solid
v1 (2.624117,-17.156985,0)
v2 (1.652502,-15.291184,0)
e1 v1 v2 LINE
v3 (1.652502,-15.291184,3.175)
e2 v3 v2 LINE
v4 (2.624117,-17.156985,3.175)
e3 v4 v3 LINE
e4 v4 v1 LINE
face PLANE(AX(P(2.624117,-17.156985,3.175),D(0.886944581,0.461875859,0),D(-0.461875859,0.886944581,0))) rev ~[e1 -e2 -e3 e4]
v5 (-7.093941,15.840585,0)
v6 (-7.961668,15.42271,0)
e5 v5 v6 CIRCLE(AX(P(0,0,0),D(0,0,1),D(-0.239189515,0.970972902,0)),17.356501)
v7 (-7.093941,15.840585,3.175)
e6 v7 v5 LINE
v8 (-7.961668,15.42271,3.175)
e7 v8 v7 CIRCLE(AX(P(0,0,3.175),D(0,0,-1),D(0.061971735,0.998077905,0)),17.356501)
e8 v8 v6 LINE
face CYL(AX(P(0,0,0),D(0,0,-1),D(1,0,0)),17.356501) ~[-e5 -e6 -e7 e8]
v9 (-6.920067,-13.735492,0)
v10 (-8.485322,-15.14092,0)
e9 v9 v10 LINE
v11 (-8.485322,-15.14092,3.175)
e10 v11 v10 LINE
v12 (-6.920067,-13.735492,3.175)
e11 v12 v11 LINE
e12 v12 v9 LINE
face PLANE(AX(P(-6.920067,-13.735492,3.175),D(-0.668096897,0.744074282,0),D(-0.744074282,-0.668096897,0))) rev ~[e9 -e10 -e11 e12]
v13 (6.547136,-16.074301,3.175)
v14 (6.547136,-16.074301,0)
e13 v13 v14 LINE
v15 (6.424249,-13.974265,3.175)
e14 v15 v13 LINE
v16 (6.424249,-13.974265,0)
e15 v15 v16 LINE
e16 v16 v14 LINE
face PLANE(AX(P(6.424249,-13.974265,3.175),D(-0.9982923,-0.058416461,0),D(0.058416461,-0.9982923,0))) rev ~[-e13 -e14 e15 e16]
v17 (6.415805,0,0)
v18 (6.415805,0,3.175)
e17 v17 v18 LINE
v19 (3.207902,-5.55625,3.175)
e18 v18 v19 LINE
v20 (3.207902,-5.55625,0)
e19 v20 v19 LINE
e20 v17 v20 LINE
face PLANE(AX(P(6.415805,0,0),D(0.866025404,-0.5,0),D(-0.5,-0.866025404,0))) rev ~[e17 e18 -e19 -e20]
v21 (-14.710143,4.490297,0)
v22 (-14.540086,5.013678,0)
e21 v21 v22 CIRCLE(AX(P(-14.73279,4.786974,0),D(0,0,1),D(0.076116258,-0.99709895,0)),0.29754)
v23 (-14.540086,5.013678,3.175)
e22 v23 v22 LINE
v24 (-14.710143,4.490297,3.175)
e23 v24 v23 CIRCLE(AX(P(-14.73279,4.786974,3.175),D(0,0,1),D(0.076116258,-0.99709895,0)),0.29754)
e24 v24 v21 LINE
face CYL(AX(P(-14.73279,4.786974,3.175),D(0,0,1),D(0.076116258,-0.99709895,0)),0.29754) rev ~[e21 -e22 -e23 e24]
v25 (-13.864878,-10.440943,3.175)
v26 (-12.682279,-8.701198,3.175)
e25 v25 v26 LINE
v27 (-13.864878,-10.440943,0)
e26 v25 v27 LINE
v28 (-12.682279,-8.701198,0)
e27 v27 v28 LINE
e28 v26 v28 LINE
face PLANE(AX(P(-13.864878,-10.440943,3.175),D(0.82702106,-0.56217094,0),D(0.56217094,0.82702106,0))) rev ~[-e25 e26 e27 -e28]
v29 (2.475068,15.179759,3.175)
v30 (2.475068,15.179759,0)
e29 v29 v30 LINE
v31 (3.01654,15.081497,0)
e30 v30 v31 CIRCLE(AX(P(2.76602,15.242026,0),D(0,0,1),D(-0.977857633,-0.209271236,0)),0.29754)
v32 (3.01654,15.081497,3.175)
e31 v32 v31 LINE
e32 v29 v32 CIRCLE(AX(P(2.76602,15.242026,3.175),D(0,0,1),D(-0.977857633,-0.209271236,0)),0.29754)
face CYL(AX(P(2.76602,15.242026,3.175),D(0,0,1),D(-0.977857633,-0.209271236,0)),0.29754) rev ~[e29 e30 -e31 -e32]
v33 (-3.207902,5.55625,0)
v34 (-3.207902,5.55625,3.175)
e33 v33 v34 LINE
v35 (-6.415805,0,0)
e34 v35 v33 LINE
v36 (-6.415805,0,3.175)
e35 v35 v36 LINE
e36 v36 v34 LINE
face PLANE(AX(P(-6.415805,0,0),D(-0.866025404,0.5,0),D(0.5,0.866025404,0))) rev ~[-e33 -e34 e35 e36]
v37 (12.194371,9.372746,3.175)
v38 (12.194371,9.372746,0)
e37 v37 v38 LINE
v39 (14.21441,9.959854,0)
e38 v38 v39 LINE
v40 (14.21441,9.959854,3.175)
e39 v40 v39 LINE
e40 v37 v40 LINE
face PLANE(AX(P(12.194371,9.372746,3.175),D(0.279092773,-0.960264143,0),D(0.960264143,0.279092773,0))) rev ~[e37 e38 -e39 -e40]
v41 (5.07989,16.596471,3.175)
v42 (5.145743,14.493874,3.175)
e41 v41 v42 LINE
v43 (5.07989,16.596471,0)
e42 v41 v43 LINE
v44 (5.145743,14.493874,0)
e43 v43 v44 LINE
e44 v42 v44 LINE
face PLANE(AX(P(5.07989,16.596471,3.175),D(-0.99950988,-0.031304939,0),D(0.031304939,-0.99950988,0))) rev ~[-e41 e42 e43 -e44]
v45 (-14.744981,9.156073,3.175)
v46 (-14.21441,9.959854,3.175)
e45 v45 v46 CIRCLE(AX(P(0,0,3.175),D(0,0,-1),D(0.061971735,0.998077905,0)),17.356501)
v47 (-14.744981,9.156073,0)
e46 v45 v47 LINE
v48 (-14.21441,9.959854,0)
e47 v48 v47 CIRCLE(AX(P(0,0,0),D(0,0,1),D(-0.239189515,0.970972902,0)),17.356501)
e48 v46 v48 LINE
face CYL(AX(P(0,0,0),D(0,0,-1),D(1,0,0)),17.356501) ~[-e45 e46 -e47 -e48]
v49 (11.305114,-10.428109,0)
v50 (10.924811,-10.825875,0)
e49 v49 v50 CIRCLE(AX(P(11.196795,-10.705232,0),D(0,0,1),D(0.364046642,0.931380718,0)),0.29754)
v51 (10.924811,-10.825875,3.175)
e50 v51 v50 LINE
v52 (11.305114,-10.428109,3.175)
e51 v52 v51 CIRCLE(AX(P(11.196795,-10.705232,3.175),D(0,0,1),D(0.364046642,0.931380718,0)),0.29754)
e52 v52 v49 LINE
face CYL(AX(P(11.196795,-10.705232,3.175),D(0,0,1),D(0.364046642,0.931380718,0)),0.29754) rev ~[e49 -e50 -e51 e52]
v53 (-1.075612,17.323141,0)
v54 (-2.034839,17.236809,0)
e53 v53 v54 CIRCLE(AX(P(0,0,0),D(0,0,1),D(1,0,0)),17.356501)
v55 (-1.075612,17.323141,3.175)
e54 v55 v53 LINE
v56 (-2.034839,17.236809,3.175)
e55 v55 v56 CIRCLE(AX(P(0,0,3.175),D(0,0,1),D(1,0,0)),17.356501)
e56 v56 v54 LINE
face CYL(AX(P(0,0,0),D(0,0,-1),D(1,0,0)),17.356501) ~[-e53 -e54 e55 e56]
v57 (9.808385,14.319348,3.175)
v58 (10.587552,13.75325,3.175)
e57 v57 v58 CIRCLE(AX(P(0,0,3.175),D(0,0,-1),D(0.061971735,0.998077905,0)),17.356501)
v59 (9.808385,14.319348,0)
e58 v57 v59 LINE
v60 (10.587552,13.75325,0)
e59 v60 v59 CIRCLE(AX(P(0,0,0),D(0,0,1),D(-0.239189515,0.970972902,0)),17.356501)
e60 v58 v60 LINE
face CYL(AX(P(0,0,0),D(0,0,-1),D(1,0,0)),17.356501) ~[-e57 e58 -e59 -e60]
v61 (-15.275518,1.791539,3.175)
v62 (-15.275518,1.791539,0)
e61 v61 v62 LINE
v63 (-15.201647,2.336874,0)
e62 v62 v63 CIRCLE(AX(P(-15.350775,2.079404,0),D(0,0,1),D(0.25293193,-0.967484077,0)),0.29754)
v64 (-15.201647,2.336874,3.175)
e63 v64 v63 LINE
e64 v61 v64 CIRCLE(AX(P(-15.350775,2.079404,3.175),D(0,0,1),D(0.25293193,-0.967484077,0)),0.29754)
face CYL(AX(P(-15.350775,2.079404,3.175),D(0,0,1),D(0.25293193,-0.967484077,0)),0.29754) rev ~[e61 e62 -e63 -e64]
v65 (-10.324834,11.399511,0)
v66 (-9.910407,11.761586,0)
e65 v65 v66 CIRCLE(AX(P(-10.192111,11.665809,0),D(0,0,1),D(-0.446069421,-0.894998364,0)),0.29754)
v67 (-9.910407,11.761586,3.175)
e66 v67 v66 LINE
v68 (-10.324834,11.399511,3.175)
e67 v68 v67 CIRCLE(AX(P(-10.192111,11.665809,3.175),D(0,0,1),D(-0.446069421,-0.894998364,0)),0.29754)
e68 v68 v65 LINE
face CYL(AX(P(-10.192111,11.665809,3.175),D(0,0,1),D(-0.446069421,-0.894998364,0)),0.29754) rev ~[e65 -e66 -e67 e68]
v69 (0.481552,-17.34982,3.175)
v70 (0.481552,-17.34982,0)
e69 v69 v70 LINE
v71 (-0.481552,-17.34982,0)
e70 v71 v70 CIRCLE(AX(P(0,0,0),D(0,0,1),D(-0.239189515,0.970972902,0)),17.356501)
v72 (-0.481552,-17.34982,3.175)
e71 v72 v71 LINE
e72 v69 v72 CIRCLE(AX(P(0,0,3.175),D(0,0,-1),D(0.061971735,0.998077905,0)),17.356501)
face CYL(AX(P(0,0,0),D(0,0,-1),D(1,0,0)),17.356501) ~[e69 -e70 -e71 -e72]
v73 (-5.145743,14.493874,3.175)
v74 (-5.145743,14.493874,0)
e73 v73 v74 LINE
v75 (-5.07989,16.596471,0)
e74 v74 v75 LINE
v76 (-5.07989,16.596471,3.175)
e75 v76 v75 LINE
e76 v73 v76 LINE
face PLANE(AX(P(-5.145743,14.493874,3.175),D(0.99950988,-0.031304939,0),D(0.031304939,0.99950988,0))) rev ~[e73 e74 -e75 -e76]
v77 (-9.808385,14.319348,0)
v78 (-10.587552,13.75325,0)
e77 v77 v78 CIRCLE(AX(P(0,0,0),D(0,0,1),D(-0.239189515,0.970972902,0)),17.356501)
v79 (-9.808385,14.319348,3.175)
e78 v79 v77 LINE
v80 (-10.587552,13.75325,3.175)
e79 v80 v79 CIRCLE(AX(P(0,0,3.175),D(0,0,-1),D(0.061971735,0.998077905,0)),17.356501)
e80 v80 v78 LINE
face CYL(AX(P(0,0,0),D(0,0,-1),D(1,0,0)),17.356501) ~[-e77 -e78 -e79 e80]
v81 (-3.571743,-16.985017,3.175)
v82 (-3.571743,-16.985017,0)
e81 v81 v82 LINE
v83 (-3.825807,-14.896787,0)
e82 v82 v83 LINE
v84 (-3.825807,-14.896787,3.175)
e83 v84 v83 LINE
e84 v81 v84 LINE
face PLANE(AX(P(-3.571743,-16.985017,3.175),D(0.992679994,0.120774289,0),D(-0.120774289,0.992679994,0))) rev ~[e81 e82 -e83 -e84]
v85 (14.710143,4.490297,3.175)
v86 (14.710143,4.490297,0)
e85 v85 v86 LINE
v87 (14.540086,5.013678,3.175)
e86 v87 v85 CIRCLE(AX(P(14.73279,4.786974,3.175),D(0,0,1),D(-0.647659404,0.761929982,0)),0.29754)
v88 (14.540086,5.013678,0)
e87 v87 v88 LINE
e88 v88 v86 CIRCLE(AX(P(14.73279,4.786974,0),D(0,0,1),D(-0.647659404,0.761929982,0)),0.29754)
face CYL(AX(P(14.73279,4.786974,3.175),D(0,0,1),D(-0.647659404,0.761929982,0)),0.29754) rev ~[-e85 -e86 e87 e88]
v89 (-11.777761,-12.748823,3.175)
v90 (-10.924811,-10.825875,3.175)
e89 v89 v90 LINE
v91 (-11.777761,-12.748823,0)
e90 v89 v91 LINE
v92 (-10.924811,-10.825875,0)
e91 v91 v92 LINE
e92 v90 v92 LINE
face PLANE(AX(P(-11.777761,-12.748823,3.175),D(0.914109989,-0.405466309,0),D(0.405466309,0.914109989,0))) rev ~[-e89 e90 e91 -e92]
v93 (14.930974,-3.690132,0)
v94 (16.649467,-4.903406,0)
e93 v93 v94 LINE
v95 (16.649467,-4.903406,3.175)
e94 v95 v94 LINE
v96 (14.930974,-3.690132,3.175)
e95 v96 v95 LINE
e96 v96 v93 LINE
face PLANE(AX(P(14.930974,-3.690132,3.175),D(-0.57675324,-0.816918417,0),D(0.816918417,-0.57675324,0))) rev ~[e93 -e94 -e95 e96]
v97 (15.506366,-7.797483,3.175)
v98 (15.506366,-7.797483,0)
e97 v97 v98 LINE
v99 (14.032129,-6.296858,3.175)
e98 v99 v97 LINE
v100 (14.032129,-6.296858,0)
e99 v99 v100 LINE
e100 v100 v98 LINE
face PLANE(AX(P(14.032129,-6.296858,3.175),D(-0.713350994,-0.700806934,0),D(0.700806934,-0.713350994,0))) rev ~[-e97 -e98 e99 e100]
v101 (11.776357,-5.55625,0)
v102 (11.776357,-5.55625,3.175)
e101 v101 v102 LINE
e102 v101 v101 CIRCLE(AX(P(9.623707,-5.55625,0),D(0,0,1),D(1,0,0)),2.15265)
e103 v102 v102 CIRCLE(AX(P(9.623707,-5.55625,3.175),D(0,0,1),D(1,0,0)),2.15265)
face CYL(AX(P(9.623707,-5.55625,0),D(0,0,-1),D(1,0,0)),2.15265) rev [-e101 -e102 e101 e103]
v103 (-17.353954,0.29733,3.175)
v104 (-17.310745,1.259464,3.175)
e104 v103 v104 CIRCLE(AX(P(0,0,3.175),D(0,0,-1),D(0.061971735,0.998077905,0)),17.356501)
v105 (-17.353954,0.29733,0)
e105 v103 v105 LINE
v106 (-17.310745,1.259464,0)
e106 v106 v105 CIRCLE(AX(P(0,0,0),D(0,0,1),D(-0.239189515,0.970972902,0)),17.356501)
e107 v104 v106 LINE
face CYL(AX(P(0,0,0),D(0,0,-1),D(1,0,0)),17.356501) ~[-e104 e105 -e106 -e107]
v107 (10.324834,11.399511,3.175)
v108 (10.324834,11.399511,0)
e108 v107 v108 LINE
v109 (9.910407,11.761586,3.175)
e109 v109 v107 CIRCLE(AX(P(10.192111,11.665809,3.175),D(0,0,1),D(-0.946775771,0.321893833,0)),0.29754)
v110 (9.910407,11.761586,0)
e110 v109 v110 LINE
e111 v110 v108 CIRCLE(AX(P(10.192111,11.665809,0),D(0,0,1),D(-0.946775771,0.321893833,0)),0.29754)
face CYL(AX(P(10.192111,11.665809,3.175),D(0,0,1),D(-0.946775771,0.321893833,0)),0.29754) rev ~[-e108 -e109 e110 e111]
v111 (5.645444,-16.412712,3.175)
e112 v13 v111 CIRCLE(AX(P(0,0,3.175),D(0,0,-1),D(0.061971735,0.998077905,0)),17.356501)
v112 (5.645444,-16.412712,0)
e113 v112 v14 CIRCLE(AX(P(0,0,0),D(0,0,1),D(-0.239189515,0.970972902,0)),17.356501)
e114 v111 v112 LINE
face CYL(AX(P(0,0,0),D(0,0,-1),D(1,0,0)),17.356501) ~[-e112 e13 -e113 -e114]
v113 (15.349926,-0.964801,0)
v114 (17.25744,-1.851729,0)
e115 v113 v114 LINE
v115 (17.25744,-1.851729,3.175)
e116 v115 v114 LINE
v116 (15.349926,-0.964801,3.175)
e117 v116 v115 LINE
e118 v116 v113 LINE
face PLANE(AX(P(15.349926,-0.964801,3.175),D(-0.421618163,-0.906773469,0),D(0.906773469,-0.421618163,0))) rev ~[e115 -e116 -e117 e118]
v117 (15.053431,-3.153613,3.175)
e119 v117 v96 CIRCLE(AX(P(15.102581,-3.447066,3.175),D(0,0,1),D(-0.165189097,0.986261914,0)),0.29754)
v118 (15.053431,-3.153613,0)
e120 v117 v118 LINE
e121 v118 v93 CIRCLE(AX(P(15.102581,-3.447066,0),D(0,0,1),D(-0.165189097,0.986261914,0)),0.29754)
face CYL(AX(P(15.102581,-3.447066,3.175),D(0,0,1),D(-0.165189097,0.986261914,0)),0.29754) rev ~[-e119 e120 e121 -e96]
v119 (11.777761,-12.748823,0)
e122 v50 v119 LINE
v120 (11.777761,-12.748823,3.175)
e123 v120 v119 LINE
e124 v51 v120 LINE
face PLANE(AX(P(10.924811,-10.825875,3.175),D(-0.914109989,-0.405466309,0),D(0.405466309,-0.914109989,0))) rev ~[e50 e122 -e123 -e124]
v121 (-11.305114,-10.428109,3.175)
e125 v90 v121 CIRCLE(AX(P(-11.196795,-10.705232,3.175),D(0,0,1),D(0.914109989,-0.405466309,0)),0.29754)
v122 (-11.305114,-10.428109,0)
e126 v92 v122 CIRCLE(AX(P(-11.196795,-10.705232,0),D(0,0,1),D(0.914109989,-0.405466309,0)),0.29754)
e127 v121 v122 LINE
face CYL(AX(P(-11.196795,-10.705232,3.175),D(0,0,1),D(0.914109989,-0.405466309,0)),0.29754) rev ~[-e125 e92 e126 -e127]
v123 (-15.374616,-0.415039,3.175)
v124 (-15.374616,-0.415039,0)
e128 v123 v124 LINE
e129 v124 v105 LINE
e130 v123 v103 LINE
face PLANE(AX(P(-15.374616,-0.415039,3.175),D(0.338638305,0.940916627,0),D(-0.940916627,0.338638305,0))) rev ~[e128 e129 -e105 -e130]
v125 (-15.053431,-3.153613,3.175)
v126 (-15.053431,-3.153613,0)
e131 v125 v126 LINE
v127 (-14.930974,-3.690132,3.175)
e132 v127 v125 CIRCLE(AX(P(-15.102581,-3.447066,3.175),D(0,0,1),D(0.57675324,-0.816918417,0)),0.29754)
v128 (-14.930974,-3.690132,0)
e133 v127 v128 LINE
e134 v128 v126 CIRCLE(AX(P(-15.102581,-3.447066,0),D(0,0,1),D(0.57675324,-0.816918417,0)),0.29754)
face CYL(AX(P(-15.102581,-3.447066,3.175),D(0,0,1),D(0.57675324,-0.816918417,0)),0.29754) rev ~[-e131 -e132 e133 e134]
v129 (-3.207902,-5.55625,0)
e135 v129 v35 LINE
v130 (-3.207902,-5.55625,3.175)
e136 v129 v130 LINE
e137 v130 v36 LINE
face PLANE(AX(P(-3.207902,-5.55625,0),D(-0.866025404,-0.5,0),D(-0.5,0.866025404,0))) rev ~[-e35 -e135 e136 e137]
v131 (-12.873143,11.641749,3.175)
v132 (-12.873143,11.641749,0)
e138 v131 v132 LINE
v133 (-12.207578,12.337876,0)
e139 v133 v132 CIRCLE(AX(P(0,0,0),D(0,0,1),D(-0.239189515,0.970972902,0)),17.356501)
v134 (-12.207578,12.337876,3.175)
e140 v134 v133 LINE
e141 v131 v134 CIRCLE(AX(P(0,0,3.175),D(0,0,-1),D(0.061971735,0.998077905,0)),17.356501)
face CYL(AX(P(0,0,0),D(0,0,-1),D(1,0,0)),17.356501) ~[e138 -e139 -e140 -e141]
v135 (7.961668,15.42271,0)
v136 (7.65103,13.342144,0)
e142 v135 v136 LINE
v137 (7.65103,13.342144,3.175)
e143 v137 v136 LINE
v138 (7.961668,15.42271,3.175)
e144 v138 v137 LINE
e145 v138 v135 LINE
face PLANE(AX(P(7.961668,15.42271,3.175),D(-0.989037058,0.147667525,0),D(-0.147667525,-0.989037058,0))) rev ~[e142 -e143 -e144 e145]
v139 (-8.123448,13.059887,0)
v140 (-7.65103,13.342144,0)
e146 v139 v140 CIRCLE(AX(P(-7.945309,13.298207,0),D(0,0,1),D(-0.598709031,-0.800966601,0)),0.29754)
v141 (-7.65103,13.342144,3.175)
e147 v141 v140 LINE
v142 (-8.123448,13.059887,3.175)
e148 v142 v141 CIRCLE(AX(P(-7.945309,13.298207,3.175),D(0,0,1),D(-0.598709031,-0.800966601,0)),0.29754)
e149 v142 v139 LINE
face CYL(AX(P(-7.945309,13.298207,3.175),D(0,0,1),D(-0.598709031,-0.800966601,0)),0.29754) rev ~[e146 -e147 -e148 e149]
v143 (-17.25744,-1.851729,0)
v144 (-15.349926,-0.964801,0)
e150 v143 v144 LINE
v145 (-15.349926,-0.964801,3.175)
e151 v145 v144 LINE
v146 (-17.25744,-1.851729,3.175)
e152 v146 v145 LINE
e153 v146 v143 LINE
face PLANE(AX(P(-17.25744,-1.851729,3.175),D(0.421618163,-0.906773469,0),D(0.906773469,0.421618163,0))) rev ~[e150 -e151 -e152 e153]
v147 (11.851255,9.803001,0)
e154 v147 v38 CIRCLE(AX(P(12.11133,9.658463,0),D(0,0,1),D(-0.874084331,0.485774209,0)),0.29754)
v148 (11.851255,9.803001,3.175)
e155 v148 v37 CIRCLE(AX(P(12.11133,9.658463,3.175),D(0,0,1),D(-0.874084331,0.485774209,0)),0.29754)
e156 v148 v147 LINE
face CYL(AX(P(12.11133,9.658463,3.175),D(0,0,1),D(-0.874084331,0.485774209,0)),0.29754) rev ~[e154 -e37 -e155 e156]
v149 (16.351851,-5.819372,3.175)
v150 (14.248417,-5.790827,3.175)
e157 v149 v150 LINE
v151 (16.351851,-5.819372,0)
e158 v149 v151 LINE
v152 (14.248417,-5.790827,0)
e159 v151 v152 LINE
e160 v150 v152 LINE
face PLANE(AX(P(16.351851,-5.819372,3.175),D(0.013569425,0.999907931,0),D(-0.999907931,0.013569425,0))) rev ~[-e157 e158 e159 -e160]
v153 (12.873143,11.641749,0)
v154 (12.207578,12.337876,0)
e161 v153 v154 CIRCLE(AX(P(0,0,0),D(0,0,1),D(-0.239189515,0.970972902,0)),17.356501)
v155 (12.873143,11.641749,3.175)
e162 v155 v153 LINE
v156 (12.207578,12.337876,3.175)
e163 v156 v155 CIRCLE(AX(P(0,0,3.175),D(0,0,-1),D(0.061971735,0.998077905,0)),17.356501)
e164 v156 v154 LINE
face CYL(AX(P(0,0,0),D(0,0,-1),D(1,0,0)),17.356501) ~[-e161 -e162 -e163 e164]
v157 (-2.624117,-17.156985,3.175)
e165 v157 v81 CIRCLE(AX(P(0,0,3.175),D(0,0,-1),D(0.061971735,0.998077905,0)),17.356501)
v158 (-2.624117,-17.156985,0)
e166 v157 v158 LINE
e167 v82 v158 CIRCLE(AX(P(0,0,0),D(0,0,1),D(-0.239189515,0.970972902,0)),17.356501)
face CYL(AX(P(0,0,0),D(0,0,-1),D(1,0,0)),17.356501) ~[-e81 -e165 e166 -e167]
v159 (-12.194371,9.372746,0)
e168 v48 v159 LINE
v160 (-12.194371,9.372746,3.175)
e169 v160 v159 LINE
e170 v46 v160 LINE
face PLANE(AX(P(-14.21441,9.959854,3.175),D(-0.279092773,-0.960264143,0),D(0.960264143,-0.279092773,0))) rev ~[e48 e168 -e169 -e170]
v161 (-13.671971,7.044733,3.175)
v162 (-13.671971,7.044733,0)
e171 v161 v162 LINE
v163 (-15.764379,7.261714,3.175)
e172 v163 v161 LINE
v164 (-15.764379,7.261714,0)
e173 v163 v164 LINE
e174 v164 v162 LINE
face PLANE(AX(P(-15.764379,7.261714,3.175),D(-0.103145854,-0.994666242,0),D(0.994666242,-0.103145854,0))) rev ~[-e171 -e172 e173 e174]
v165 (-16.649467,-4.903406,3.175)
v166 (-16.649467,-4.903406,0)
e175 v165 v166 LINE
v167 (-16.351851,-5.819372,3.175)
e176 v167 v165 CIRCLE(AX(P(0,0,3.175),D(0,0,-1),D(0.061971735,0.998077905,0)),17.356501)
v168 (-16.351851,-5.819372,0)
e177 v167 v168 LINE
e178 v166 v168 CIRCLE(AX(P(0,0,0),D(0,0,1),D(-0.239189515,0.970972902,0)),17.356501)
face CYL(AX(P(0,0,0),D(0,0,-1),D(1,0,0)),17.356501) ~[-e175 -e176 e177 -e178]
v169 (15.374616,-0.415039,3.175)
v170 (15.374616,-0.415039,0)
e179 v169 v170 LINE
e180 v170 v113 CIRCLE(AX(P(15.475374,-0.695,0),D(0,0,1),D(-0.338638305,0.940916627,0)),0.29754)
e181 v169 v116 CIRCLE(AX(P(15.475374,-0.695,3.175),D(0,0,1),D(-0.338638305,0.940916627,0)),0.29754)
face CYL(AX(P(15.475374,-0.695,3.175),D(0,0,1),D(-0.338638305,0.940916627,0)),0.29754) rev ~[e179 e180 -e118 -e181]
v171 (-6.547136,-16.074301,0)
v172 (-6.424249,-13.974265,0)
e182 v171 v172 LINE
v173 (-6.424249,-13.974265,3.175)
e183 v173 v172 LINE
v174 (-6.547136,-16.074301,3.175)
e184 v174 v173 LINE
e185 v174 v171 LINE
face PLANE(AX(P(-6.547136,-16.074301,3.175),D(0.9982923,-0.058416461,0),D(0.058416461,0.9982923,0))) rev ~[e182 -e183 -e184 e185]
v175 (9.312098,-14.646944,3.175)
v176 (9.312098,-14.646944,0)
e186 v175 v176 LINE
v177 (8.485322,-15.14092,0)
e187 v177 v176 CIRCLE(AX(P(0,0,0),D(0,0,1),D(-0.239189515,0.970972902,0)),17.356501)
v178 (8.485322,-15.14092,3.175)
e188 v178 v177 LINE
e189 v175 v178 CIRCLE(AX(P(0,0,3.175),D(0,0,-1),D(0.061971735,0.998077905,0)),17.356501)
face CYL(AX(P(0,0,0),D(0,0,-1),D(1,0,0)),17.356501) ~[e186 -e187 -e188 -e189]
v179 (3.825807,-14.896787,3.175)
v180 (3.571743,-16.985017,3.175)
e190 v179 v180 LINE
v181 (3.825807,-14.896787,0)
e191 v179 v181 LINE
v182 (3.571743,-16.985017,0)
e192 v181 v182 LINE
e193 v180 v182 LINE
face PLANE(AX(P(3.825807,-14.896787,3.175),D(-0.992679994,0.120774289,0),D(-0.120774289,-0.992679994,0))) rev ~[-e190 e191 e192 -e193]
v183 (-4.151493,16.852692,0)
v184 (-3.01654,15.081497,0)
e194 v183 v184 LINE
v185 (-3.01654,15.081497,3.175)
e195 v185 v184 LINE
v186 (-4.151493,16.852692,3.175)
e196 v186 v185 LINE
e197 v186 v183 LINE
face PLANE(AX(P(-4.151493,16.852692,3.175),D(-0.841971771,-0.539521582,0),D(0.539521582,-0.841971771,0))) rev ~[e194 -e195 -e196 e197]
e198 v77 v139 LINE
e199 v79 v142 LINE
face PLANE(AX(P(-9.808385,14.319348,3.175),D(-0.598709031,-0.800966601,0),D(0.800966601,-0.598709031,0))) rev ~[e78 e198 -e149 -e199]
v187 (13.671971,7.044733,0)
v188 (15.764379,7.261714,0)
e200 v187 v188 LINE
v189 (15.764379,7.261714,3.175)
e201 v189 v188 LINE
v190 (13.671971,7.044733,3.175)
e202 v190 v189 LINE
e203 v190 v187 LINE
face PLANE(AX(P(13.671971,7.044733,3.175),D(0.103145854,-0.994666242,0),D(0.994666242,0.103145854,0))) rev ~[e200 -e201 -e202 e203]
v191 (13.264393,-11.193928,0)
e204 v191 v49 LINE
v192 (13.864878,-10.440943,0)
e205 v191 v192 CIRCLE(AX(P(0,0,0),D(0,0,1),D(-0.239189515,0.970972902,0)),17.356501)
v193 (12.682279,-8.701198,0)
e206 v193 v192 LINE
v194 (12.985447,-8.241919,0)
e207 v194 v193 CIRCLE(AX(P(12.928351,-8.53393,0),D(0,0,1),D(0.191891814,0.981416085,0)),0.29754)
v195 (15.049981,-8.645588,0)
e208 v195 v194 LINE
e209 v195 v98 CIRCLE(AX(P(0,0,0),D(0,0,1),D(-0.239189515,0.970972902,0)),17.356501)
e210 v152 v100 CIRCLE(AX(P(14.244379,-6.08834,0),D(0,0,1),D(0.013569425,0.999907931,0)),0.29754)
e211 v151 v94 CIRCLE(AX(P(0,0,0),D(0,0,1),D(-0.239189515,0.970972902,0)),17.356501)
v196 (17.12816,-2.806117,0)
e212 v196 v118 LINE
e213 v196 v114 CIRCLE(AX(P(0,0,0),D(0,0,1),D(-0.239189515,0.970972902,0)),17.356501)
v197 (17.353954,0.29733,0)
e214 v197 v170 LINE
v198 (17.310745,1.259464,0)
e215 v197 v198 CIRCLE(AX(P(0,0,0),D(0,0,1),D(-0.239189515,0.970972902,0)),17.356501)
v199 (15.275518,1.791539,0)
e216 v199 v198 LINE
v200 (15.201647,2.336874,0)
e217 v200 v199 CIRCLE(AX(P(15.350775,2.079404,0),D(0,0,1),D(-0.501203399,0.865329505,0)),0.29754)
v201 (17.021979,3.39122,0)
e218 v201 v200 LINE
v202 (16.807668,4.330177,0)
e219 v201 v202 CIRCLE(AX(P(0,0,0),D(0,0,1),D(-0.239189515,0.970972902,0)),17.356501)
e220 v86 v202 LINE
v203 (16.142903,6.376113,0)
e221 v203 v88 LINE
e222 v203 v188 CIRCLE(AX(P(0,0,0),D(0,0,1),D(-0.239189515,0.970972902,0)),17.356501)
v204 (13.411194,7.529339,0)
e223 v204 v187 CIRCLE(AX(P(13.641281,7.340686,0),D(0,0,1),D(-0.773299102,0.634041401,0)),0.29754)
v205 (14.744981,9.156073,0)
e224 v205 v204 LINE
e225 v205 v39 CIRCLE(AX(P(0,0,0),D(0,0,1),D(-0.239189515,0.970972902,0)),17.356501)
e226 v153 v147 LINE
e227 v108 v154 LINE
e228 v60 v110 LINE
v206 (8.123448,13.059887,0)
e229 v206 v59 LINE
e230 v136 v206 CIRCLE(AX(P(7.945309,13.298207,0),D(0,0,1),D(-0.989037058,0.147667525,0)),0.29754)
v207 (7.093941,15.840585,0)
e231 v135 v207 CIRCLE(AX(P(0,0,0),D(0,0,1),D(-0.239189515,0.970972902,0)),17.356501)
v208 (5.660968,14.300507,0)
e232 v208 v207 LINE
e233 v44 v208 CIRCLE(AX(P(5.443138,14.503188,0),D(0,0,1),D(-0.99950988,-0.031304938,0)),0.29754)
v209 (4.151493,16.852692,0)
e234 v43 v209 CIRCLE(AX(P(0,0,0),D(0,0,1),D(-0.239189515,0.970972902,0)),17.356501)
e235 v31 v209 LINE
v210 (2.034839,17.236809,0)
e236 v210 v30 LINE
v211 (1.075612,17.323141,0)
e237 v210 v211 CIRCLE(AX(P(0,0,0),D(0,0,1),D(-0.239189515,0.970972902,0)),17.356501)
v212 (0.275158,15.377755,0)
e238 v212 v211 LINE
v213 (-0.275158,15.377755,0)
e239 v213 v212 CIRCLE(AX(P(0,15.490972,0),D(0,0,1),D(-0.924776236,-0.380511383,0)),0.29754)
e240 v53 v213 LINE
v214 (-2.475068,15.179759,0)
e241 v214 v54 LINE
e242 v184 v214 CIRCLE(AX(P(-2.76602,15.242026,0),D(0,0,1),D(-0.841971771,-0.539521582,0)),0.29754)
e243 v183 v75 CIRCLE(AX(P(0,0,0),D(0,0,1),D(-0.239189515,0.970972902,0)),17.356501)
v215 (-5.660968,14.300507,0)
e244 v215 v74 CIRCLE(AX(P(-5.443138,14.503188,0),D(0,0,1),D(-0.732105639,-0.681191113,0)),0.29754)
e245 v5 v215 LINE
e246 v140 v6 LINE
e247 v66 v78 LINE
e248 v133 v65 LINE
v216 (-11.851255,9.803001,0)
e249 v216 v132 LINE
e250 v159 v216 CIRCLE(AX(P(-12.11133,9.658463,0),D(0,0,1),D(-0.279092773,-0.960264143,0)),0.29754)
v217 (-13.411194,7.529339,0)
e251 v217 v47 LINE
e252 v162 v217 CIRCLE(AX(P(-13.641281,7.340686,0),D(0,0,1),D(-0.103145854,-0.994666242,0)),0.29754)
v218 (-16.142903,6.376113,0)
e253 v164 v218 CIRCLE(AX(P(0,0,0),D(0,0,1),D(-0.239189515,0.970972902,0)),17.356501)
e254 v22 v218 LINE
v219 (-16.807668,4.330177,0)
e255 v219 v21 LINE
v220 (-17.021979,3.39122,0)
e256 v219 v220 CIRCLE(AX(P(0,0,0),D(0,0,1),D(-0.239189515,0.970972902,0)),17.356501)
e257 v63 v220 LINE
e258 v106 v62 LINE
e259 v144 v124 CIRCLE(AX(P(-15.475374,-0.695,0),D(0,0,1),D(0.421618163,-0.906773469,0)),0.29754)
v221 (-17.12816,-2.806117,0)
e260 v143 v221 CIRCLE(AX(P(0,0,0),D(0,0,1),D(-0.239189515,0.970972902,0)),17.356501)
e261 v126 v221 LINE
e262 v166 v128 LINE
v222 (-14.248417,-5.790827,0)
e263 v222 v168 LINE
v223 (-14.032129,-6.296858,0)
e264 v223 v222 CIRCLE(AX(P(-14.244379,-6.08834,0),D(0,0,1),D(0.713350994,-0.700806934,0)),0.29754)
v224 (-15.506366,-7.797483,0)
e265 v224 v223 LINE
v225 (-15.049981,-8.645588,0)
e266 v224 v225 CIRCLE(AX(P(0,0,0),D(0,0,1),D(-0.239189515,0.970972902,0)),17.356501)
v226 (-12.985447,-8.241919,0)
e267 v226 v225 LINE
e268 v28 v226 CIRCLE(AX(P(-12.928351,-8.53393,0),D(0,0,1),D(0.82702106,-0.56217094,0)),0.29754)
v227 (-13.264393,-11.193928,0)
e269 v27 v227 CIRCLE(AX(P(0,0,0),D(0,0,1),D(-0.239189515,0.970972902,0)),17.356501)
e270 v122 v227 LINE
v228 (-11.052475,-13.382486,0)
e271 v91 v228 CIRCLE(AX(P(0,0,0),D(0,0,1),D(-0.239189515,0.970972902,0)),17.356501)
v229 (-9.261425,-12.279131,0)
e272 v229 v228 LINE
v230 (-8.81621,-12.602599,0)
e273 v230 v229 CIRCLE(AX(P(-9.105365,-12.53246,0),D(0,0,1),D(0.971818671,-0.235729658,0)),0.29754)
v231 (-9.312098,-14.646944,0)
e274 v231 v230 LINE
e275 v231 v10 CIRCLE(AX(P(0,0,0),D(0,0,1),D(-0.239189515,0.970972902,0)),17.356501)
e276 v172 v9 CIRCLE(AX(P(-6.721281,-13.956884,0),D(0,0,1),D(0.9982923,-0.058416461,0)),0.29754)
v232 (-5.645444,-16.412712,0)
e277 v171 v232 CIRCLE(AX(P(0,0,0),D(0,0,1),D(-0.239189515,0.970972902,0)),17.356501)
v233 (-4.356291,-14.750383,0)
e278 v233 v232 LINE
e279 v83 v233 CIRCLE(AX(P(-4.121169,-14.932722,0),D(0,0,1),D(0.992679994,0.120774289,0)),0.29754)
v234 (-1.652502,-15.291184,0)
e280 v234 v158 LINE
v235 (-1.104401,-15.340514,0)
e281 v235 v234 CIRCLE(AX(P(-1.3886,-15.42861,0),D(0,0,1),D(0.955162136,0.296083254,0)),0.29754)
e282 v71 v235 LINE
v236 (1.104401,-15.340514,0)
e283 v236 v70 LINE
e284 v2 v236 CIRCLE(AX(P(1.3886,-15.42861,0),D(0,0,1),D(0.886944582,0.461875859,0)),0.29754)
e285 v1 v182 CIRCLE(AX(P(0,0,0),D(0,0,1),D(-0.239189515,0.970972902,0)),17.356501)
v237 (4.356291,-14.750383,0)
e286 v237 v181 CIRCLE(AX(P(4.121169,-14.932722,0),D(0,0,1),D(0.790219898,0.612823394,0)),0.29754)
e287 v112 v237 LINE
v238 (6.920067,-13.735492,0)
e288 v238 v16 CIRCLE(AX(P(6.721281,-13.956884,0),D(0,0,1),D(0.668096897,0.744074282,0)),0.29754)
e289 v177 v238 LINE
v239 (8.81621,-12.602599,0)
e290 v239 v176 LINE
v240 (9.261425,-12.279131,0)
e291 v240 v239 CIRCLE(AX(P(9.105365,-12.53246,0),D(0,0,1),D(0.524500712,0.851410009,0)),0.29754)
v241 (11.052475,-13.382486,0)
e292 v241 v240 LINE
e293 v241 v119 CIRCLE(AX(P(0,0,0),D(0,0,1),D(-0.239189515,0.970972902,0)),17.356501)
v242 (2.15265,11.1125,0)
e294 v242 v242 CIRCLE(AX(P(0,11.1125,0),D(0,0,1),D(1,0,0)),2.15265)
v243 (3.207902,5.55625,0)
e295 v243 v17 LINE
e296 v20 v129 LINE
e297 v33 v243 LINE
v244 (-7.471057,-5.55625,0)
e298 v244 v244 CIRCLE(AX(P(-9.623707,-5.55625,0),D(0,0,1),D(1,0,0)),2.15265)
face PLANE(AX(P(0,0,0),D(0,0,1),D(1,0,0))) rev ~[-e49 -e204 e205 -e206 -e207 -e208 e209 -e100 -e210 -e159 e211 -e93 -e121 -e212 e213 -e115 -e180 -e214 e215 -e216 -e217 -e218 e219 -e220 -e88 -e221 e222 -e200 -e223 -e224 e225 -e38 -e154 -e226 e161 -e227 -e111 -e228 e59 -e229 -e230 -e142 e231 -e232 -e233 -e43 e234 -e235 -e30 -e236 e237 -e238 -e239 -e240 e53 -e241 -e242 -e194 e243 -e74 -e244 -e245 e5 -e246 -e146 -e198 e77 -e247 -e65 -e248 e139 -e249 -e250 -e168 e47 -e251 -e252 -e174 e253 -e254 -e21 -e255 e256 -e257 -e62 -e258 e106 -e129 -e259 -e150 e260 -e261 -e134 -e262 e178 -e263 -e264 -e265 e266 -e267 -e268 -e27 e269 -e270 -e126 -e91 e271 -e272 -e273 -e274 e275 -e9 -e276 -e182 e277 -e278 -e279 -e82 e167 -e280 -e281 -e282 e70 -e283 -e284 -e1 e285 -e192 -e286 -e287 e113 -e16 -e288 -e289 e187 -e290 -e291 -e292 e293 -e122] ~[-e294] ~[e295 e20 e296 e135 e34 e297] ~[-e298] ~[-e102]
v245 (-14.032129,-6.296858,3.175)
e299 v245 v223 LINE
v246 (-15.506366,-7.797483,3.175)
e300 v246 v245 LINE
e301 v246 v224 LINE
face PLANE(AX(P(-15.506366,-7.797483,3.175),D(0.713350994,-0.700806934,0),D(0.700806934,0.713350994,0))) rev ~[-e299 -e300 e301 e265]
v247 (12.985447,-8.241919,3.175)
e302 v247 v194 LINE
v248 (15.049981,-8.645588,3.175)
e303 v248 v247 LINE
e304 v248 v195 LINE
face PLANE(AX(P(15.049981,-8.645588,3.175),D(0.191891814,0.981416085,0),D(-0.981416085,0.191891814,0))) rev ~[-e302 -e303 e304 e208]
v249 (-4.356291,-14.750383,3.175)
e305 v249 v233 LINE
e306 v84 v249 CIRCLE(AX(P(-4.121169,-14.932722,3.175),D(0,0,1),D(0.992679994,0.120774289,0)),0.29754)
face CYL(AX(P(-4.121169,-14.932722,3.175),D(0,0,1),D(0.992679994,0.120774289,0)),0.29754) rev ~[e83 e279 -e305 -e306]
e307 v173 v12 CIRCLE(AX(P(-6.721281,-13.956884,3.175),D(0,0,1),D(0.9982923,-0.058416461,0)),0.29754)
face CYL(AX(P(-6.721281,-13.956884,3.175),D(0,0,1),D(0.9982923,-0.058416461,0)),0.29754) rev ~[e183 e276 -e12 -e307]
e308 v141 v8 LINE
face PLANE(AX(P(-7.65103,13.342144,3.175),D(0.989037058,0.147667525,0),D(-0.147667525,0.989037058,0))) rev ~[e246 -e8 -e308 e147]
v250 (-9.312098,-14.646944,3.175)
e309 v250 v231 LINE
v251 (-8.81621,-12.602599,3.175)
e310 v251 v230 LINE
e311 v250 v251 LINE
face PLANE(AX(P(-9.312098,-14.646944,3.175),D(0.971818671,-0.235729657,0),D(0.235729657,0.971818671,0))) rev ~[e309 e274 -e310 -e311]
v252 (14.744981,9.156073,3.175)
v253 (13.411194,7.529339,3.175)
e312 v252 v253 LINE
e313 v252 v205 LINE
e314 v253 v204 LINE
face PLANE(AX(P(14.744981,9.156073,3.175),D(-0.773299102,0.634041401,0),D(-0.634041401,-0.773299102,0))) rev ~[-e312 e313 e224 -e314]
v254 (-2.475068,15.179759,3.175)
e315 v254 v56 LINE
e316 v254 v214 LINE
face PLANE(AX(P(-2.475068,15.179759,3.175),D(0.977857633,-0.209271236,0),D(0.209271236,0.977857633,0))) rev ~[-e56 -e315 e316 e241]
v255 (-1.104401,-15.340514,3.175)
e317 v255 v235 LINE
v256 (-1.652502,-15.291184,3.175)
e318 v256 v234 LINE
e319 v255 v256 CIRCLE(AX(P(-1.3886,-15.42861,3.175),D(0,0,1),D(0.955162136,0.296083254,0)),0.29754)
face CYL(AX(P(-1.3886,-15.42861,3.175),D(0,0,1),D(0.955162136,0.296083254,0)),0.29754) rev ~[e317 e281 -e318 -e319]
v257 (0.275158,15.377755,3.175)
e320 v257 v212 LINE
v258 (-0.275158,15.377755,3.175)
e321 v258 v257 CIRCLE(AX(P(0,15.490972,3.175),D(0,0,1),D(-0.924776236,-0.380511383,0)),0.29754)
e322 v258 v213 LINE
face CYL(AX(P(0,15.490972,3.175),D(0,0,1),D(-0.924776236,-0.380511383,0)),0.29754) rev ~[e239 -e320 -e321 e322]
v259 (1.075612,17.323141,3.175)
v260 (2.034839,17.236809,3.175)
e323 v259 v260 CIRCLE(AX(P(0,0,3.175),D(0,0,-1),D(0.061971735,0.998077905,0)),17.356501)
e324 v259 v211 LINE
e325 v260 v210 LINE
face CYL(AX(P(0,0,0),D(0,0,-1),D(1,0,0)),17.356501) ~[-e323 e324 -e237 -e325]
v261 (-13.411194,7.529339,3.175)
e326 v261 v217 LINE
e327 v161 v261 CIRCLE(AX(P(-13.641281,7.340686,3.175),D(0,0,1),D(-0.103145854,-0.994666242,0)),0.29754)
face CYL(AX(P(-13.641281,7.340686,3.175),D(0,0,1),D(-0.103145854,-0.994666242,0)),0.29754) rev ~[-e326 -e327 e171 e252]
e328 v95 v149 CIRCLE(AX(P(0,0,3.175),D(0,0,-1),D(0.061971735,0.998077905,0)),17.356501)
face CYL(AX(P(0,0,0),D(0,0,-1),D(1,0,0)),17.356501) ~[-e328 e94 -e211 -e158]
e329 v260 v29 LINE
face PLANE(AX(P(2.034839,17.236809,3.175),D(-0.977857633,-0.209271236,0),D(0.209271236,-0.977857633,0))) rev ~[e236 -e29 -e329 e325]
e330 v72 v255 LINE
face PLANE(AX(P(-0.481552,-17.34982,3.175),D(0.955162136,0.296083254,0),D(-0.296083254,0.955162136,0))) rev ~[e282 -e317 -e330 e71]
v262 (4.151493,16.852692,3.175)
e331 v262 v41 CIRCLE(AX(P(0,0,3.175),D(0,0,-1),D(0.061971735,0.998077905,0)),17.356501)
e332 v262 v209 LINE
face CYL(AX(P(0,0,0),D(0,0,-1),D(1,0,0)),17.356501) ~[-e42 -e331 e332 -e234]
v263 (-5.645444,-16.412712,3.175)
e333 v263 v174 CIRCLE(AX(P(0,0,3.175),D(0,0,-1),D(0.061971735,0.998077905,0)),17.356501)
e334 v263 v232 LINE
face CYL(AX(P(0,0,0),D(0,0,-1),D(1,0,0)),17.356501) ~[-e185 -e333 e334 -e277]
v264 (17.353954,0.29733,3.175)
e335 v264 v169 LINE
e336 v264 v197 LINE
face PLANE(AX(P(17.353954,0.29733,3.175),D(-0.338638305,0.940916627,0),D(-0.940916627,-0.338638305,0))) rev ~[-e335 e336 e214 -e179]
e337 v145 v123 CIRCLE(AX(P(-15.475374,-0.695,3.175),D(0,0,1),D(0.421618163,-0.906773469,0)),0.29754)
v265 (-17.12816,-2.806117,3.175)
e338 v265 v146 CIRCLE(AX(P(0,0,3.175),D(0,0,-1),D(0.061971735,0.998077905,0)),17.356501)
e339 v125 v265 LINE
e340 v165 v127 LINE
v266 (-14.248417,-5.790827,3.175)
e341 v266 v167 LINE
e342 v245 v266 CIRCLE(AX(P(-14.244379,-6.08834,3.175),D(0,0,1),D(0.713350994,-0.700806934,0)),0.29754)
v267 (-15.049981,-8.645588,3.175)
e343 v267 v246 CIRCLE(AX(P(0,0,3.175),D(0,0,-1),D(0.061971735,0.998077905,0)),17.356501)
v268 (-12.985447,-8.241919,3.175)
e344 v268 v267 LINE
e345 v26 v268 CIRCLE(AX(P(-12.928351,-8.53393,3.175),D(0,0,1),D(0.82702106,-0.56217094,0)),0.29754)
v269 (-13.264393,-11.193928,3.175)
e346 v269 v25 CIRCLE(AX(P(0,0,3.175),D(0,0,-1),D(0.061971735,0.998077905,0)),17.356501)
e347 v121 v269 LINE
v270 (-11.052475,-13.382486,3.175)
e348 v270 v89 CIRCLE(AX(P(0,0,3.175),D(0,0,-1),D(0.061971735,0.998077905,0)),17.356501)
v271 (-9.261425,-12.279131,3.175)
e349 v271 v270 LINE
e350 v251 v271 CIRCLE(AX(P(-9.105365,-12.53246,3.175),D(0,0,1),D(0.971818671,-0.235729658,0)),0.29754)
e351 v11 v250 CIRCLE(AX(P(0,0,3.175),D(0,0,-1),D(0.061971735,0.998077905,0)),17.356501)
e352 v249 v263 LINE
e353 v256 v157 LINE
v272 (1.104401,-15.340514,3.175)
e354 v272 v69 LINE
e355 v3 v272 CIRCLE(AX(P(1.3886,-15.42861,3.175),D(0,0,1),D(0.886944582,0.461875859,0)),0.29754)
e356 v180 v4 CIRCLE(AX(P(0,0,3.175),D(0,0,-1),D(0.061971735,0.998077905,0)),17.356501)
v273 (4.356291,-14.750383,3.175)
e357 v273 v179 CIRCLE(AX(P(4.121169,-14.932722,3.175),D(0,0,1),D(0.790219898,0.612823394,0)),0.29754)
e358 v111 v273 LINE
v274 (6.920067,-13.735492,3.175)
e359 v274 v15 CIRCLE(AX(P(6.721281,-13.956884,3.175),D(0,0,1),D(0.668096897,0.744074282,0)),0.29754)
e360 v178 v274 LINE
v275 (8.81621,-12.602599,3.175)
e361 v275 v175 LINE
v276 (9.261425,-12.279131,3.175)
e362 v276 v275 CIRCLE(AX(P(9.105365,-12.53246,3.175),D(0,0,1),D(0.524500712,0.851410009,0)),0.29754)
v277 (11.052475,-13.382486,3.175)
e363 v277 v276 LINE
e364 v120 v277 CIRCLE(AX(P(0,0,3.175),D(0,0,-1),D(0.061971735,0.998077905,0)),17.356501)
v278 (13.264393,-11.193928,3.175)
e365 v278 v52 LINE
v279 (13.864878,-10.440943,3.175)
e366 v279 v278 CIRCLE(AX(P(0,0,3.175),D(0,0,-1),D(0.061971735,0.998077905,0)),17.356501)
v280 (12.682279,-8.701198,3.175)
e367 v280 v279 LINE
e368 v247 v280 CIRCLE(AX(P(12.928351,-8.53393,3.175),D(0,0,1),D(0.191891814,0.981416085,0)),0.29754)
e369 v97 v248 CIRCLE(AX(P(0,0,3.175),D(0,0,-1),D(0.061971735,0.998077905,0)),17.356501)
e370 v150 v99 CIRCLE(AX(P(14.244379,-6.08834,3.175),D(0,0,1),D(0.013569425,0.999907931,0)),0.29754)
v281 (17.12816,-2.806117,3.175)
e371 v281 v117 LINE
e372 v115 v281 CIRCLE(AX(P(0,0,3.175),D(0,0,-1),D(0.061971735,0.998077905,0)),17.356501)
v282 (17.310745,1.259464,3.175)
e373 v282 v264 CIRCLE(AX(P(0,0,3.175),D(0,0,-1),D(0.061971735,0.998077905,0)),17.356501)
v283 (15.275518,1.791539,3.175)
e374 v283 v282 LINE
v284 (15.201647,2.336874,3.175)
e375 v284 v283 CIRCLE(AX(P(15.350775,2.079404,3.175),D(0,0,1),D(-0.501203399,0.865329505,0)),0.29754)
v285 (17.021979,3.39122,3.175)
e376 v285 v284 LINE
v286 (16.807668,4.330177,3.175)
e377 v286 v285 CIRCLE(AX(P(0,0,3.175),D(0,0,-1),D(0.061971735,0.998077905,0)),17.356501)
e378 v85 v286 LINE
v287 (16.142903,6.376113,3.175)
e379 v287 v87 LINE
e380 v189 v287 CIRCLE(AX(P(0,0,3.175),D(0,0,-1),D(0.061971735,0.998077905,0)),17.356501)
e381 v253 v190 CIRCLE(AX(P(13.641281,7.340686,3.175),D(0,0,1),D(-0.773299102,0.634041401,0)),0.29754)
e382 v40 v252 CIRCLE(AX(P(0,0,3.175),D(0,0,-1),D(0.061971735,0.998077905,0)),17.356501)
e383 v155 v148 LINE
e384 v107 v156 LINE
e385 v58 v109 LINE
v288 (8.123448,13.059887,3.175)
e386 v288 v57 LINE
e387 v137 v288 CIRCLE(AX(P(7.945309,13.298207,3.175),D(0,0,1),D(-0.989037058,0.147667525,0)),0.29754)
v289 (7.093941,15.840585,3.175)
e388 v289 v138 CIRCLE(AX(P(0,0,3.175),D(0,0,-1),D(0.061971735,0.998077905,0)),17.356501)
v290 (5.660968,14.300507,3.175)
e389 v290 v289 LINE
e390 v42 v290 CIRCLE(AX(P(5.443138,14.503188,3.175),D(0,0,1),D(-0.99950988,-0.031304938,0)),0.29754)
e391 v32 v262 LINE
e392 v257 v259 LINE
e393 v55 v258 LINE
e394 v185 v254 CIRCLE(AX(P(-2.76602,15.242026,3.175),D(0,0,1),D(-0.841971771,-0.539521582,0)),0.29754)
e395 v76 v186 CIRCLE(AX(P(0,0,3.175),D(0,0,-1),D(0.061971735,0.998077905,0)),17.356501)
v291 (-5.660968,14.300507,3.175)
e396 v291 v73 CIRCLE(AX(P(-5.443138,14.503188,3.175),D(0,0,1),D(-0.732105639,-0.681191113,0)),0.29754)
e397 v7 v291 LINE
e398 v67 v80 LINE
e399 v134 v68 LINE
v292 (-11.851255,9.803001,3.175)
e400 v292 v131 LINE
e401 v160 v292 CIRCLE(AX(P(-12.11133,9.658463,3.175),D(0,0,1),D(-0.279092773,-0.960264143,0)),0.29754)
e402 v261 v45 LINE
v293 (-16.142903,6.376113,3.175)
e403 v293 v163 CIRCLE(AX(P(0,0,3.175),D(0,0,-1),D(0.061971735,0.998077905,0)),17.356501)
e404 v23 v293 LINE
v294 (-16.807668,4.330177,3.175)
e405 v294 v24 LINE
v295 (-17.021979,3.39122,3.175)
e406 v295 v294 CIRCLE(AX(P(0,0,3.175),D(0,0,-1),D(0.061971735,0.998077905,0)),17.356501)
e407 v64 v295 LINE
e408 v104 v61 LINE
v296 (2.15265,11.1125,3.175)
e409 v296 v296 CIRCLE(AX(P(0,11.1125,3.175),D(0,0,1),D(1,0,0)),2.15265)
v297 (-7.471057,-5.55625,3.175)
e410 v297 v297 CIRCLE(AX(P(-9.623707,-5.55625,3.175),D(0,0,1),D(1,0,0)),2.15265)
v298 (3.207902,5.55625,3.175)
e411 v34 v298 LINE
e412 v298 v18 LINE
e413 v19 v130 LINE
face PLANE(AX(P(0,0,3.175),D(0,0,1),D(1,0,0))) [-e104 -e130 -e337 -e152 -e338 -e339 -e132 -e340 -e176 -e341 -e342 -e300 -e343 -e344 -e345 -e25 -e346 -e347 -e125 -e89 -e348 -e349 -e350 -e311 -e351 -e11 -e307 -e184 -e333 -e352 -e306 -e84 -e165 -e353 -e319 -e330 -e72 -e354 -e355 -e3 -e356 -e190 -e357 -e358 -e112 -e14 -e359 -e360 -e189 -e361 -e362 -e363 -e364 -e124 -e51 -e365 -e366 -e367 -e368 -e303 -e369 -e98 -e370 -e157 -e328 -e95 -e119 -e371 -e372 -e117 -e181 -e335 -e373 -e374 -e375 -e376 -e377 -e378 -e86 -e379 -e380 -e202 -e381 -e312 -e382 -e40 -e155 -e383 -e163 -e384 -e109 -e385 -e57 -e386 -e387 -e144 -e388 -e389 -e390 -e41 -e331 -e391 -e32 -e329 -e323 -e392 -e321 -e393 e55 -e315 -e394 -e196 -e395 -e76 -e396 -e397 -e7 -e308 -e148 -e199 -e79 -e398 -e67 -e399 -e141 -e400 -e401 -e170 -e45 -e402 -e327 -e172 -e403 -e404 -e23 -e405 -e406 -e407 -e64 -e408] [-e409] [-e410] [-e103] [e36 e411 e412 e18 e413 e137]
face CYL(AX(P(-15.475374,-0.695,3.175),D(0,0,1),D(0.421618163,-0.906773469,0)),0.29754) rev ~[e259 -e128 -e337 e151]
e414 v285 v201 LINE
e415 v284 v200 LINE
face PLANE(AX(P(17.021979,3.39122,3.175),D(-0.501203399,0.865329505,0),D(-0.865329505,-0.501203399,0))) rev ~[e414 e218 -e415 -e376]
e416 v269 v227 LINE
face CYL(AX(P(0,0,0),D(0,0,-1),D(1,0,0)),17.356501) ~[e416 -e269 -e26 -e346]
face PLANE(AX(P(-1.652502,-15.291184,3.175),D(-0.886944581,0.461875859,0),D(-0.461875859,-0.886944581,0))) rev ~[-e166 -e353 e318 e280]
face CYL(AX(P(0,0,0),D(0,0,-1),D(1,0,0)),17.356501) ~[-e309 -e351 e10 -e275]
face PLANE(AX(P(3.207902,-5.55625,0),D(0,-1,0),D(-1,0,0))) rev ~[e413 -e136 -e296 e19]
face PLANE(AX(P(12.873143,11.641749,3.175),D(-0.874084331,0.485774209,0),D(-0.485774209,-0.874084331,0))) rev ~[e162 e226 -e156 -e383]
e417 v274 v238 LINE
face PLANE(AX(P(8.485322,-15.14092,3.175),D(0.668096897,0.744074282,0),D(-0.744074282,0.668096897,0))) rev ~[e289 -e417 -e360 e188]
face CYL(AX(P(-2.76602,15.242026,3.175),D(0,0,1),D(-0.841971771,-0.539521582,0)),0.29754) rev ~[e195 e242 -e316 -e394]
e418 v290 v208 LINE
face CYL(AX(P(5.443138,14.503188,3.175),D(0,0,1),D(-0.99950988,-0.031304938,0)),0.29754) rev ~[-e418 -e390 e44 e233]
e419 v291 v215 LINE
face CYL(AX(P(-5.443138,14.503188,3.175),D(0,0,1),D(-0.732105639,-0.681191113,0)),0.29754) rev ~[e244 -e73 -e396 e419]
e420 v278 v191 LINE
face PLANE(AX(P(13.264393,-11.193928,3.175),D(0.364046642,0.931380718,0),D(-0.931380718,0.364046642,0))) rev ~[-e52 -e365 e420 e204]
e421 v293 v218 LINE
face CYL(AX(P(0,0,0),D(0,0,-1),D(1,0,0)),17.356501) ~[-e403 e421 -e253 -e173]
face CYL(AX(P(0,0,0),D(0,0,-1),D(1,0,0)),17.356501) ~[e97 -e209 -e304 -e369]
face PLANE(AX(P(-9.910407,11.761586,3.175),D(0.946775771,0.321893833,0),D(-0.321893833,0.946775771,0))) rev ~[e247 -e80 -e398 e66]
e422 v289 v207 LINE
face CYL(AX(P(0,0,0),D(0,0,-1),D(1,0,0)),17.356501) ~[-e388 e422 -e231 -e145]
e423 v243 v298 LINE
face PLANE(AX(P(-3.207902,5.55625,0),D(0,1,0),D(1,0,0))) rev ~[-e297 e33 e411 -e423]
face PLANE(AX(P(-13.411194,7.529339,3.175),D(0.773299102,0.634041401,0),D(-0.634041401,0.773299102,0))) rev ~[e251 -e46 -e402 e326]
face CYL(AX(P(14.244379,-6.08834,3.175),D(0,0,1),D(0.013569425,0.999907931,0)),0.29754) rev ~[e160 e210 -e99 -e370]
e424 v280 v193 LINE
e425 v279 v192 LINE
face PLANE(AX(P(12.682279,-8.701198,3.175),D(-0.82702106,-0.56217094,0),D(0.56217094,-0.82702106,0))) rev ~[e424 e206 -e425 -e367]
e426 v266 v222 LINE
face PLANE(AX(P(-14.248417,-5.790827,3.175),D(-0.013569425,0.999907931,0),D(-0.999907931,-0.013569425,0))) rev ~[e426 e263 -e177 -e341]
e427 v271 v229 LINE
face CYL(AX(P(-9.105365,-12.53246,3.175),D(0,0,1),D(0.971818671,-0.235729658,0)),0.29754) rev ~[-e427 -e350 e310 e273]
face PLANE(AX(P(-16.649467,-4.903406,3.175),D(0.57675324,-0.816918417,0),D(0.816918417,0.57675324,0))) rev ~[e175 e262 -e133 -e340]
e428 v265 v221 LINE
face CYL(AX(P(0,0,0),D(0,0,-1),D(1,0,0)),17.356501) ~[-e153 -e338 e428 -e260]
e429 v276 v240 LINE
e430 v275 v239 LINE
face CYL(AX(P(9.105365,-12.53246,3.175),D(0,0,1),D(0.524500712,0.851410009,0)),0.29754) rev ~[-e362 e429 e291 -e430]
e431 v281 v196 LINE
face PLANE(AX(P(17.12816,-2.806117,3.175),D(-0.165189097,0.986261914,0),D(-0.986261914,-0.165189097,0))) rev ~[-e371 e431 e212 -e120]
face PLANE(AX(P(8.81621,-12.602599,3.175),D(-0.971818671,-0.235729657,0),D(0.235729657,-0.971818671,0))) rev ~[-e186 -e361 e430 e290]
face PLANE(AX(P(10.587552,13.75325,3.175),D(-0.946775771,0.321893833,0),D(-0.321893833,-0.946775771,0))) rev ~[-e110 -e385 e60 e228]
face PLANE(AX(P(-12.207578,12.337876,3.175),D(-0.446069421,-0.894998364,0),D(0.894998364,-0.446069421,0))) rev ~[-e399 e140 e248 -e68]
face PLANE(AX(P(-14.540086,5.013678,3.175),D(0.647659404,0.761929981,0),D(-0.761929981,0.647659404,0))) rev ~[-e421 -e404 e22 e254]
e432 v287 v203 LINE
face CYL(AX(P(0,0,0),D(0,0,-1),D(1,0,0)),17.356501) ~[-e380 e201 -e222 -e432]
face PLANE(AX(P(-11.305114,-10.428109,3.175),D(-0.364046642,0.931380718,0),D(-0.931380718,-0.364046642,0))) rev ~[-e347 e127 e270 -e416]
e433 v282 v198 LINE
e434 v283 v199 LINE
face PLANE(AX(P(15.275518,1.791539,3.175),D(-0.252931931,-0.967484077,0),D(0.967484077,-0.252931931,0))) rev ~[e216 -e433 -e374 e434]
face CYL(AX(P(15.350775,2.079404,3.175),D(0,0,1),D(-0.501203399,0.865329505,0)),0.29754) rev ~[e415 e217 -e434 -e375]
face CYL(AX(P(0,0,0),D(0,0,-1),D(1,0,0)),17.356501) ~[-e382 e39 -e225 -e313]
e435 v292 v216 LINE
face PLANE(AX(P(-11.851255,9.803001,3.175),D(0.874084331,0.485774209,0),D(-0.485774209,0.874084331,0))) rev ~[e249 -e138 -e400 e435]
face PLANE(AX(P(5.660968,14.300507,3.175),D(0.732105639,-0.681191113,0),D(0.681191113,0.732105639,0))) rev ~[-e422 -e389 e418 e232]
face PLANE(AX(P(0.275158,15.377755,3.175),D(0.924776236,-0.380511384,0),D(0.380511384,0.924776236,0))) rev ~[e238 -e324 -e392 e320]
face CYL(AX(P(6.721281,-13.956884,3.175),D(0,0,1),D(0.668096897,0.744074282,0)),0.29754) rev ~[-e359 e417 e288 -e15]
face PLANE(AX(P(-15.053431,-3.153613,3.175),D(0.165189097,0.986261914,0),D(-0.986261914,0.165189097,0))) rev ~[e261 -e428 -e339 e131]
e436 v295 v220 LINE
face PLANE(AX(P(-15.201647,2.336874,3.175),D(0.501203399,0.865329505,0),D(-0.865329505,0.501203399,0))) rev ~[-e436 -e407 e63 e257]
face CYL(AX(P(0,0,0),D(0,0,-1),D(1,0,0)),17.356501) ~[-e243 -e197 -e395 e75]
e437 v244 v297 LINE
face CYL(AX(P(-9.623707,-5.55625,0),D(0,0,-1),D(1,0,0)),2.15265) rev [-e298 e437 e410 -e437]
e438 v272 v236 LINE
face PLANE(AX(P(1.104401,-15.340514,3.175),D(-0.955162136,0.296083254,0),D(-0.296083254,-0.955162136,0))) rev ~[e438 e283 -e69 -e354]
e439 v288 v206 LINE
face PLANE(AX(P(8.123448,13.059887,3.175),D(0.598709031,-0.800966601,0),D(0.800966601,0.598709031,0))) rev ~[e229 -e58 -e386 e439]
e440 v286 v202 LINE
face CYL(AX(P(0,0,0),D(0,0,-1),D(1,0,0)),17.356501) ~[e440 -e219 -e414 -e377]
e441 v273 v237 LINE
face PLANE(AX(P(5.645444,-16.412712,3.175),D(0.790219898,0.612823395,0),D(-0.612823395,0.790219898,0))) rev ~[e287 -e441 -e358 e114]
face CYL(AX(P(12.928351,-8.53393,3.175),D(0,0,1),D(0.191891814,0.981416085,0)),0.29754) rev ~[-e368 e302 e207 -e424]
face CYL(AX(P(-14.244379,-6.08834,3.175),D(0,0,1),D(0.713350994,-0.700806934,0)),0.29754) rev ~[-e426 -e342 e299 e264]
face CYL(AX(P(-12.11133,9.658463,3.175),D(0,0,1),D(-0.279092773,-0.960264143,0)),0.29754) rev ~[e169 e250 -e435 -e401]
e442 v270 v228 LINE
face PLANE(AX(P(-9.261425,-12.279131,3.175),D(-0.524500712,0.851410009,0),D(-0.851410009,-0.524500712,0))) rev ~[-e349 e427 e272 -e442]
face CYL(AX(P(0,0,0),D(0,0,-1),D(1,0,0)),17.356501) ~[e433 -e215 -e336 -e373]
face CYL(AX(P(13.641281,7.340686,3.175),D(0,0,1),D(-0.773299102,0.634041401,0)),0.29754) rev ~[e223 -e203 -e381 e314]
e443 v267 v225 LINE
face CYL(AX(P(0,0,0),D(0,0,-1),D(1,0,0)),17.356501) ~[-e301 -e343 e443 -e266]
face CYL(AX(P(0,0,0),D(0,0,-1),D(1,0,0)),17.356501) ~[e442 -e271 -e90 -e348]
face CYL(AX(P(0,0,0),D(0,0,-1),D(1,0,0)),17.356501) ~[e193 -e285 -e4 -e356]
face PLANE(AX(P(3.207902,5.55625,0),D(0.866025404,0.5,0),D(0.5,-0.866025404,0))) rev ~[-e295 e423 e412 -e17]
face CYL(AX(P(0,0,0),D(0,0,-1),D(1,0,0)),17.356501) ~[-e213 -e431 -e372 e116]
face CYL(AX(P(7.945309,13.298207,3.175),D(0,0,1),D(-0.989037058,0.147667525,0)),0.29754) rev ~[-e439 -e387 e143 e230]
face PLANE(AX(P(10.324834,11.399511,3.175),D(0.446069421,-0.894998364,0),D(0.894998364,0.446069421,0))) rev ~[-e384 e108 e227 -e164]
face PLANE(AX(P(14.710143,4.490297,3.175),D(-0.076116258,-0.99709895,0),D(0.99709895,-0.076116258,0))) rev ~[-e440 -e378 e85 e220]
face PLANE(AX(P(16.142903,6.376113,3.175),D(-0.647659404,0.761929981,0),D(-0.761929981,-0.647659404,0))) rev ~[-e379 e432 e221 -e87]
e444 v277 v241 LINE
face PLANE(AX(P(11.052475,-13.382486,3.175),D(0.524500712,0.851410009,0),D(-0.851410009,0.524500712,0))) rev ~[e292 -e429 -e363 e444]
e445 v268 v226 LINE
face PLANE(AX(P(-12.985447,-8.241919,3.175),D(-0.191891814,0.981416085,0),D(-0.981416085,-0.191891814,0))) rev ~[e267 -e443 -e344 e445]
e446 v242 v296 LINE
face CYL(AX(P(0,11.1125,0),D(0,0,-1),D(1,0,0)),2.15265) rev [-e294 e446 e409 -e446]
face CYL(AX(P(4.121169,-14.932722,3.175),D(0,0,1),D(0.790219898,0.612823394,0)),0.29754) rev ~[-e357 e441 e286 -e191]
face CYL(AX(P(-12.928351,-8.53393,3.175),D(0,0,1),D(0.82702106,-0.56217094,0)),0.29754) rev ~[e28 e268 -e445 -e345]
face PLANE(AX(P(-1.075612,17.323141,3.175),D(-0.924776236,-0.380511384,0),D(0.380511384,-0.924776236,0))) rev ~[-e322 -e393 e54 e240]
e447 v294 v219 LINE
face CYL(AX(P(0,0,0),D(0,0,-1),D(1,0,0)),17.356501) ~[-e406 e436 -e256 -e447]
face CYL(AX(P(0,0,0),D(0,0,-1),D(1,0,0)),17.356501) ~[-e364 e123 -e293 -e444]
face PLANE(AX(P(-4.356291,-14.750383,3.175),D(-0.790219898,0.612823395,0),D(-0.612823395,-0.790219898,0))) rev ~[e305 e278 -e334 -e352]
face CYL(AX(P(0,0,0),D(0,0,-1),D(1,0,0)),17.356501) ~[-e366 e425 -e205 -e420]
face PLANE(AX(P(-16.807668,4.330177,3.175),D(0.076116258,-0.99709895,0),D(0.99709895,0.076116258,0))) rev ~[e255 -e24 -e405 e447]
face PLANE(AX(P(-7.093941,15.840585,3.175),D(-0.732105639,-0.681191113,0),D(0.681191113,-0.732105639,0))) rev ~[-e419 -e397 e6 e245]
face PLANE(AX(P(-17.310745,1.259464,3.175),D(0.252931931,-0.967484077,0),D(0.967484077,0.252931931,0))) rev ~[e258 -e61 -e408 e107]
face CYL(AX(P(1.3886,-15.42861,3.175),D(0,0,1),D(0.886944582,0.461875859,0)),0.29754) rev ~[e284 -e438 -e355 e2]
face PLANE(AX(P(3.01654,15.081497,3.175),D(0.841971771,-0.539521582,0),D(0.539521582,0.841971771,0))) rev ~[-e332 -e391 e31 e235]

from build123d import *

# Parameters (mm, degrees)
F0_R            = 17.3565013667
F0_R_2          = 2.15265
F1_DEPTH        = 3.175
F3_DEPTH        = 3.175
F3_COPIES_COUNT = 35


# Not quite as in the source:
# - a pattern or mirror of a feature is missing from the dataset's text; its kind, count and spacing are read off the source's solid
# - a feature names something its author has since deleted; it is built from what else it names


with BuildPart() as f1:
    # F0 (on Top) → F1 (new body)
    with BuildSketch(Plane.XY):
        Circle(F0_R)
        with Locations((-9.6237072996, -5.55625)):
            Circle(F0_R_2, mode=Mode.SUBTRACT)
        with Locations((9.6237072996, -5.55625)):
            Circle(F0_R_2, mode=Mode.SUBTRACT)
        Polygon((6.4158048664, 0), (3.2079024332, -5.55625), (-3.2079024332, -5.55625), (-6.4158048664, 0), (-3.2079024332, 5.55625), (3.2079024332, 5.55625), align=None, mode=Mode.SUBTRACT)
        with Locations((0, 11.1125)):
            Circle(F0_R_2, mode=Mode.SUBTRACT)
    extrude(amount=F1_DEPTH)

    # F2 (on face) → F3 (cut, through all)
    with BuildSketch(Plane.XY.offset(3.175)):
        with BuildLine():
            Line((0.275157943, 15.3777549622), (1.0756124971, 17.3231405192))
            ThreePointArc((1.0756124971, 17.3231405192), (0, 17.3565013667), (-1.0756124971, 17.3231405192))
            Line((-1.0756124971, 17.3231405192), (-0.275157943, 15.3777549622))
            ThreePointArc((-0.275157943, 15.3777549622), (0, 15.1934323047), (0.275157943, 15.3777549622))
        make_face()
    f3 = extrude(amount=-F3_DEPTH, mode=Mode.SUBTRACT)

    # F3_copies: F3 ×35 about axis
    f3_copies_axis = Axis((0, 0, 0), (0, 0, 1))
    for i in range(1, F3_COPIES_COUNT):
        add(f3.rotate(f3_copies_axis, i * 360 / F3_COPIES_COUNT), mode=Mode.SUBTRACT)


solid = f1.part
